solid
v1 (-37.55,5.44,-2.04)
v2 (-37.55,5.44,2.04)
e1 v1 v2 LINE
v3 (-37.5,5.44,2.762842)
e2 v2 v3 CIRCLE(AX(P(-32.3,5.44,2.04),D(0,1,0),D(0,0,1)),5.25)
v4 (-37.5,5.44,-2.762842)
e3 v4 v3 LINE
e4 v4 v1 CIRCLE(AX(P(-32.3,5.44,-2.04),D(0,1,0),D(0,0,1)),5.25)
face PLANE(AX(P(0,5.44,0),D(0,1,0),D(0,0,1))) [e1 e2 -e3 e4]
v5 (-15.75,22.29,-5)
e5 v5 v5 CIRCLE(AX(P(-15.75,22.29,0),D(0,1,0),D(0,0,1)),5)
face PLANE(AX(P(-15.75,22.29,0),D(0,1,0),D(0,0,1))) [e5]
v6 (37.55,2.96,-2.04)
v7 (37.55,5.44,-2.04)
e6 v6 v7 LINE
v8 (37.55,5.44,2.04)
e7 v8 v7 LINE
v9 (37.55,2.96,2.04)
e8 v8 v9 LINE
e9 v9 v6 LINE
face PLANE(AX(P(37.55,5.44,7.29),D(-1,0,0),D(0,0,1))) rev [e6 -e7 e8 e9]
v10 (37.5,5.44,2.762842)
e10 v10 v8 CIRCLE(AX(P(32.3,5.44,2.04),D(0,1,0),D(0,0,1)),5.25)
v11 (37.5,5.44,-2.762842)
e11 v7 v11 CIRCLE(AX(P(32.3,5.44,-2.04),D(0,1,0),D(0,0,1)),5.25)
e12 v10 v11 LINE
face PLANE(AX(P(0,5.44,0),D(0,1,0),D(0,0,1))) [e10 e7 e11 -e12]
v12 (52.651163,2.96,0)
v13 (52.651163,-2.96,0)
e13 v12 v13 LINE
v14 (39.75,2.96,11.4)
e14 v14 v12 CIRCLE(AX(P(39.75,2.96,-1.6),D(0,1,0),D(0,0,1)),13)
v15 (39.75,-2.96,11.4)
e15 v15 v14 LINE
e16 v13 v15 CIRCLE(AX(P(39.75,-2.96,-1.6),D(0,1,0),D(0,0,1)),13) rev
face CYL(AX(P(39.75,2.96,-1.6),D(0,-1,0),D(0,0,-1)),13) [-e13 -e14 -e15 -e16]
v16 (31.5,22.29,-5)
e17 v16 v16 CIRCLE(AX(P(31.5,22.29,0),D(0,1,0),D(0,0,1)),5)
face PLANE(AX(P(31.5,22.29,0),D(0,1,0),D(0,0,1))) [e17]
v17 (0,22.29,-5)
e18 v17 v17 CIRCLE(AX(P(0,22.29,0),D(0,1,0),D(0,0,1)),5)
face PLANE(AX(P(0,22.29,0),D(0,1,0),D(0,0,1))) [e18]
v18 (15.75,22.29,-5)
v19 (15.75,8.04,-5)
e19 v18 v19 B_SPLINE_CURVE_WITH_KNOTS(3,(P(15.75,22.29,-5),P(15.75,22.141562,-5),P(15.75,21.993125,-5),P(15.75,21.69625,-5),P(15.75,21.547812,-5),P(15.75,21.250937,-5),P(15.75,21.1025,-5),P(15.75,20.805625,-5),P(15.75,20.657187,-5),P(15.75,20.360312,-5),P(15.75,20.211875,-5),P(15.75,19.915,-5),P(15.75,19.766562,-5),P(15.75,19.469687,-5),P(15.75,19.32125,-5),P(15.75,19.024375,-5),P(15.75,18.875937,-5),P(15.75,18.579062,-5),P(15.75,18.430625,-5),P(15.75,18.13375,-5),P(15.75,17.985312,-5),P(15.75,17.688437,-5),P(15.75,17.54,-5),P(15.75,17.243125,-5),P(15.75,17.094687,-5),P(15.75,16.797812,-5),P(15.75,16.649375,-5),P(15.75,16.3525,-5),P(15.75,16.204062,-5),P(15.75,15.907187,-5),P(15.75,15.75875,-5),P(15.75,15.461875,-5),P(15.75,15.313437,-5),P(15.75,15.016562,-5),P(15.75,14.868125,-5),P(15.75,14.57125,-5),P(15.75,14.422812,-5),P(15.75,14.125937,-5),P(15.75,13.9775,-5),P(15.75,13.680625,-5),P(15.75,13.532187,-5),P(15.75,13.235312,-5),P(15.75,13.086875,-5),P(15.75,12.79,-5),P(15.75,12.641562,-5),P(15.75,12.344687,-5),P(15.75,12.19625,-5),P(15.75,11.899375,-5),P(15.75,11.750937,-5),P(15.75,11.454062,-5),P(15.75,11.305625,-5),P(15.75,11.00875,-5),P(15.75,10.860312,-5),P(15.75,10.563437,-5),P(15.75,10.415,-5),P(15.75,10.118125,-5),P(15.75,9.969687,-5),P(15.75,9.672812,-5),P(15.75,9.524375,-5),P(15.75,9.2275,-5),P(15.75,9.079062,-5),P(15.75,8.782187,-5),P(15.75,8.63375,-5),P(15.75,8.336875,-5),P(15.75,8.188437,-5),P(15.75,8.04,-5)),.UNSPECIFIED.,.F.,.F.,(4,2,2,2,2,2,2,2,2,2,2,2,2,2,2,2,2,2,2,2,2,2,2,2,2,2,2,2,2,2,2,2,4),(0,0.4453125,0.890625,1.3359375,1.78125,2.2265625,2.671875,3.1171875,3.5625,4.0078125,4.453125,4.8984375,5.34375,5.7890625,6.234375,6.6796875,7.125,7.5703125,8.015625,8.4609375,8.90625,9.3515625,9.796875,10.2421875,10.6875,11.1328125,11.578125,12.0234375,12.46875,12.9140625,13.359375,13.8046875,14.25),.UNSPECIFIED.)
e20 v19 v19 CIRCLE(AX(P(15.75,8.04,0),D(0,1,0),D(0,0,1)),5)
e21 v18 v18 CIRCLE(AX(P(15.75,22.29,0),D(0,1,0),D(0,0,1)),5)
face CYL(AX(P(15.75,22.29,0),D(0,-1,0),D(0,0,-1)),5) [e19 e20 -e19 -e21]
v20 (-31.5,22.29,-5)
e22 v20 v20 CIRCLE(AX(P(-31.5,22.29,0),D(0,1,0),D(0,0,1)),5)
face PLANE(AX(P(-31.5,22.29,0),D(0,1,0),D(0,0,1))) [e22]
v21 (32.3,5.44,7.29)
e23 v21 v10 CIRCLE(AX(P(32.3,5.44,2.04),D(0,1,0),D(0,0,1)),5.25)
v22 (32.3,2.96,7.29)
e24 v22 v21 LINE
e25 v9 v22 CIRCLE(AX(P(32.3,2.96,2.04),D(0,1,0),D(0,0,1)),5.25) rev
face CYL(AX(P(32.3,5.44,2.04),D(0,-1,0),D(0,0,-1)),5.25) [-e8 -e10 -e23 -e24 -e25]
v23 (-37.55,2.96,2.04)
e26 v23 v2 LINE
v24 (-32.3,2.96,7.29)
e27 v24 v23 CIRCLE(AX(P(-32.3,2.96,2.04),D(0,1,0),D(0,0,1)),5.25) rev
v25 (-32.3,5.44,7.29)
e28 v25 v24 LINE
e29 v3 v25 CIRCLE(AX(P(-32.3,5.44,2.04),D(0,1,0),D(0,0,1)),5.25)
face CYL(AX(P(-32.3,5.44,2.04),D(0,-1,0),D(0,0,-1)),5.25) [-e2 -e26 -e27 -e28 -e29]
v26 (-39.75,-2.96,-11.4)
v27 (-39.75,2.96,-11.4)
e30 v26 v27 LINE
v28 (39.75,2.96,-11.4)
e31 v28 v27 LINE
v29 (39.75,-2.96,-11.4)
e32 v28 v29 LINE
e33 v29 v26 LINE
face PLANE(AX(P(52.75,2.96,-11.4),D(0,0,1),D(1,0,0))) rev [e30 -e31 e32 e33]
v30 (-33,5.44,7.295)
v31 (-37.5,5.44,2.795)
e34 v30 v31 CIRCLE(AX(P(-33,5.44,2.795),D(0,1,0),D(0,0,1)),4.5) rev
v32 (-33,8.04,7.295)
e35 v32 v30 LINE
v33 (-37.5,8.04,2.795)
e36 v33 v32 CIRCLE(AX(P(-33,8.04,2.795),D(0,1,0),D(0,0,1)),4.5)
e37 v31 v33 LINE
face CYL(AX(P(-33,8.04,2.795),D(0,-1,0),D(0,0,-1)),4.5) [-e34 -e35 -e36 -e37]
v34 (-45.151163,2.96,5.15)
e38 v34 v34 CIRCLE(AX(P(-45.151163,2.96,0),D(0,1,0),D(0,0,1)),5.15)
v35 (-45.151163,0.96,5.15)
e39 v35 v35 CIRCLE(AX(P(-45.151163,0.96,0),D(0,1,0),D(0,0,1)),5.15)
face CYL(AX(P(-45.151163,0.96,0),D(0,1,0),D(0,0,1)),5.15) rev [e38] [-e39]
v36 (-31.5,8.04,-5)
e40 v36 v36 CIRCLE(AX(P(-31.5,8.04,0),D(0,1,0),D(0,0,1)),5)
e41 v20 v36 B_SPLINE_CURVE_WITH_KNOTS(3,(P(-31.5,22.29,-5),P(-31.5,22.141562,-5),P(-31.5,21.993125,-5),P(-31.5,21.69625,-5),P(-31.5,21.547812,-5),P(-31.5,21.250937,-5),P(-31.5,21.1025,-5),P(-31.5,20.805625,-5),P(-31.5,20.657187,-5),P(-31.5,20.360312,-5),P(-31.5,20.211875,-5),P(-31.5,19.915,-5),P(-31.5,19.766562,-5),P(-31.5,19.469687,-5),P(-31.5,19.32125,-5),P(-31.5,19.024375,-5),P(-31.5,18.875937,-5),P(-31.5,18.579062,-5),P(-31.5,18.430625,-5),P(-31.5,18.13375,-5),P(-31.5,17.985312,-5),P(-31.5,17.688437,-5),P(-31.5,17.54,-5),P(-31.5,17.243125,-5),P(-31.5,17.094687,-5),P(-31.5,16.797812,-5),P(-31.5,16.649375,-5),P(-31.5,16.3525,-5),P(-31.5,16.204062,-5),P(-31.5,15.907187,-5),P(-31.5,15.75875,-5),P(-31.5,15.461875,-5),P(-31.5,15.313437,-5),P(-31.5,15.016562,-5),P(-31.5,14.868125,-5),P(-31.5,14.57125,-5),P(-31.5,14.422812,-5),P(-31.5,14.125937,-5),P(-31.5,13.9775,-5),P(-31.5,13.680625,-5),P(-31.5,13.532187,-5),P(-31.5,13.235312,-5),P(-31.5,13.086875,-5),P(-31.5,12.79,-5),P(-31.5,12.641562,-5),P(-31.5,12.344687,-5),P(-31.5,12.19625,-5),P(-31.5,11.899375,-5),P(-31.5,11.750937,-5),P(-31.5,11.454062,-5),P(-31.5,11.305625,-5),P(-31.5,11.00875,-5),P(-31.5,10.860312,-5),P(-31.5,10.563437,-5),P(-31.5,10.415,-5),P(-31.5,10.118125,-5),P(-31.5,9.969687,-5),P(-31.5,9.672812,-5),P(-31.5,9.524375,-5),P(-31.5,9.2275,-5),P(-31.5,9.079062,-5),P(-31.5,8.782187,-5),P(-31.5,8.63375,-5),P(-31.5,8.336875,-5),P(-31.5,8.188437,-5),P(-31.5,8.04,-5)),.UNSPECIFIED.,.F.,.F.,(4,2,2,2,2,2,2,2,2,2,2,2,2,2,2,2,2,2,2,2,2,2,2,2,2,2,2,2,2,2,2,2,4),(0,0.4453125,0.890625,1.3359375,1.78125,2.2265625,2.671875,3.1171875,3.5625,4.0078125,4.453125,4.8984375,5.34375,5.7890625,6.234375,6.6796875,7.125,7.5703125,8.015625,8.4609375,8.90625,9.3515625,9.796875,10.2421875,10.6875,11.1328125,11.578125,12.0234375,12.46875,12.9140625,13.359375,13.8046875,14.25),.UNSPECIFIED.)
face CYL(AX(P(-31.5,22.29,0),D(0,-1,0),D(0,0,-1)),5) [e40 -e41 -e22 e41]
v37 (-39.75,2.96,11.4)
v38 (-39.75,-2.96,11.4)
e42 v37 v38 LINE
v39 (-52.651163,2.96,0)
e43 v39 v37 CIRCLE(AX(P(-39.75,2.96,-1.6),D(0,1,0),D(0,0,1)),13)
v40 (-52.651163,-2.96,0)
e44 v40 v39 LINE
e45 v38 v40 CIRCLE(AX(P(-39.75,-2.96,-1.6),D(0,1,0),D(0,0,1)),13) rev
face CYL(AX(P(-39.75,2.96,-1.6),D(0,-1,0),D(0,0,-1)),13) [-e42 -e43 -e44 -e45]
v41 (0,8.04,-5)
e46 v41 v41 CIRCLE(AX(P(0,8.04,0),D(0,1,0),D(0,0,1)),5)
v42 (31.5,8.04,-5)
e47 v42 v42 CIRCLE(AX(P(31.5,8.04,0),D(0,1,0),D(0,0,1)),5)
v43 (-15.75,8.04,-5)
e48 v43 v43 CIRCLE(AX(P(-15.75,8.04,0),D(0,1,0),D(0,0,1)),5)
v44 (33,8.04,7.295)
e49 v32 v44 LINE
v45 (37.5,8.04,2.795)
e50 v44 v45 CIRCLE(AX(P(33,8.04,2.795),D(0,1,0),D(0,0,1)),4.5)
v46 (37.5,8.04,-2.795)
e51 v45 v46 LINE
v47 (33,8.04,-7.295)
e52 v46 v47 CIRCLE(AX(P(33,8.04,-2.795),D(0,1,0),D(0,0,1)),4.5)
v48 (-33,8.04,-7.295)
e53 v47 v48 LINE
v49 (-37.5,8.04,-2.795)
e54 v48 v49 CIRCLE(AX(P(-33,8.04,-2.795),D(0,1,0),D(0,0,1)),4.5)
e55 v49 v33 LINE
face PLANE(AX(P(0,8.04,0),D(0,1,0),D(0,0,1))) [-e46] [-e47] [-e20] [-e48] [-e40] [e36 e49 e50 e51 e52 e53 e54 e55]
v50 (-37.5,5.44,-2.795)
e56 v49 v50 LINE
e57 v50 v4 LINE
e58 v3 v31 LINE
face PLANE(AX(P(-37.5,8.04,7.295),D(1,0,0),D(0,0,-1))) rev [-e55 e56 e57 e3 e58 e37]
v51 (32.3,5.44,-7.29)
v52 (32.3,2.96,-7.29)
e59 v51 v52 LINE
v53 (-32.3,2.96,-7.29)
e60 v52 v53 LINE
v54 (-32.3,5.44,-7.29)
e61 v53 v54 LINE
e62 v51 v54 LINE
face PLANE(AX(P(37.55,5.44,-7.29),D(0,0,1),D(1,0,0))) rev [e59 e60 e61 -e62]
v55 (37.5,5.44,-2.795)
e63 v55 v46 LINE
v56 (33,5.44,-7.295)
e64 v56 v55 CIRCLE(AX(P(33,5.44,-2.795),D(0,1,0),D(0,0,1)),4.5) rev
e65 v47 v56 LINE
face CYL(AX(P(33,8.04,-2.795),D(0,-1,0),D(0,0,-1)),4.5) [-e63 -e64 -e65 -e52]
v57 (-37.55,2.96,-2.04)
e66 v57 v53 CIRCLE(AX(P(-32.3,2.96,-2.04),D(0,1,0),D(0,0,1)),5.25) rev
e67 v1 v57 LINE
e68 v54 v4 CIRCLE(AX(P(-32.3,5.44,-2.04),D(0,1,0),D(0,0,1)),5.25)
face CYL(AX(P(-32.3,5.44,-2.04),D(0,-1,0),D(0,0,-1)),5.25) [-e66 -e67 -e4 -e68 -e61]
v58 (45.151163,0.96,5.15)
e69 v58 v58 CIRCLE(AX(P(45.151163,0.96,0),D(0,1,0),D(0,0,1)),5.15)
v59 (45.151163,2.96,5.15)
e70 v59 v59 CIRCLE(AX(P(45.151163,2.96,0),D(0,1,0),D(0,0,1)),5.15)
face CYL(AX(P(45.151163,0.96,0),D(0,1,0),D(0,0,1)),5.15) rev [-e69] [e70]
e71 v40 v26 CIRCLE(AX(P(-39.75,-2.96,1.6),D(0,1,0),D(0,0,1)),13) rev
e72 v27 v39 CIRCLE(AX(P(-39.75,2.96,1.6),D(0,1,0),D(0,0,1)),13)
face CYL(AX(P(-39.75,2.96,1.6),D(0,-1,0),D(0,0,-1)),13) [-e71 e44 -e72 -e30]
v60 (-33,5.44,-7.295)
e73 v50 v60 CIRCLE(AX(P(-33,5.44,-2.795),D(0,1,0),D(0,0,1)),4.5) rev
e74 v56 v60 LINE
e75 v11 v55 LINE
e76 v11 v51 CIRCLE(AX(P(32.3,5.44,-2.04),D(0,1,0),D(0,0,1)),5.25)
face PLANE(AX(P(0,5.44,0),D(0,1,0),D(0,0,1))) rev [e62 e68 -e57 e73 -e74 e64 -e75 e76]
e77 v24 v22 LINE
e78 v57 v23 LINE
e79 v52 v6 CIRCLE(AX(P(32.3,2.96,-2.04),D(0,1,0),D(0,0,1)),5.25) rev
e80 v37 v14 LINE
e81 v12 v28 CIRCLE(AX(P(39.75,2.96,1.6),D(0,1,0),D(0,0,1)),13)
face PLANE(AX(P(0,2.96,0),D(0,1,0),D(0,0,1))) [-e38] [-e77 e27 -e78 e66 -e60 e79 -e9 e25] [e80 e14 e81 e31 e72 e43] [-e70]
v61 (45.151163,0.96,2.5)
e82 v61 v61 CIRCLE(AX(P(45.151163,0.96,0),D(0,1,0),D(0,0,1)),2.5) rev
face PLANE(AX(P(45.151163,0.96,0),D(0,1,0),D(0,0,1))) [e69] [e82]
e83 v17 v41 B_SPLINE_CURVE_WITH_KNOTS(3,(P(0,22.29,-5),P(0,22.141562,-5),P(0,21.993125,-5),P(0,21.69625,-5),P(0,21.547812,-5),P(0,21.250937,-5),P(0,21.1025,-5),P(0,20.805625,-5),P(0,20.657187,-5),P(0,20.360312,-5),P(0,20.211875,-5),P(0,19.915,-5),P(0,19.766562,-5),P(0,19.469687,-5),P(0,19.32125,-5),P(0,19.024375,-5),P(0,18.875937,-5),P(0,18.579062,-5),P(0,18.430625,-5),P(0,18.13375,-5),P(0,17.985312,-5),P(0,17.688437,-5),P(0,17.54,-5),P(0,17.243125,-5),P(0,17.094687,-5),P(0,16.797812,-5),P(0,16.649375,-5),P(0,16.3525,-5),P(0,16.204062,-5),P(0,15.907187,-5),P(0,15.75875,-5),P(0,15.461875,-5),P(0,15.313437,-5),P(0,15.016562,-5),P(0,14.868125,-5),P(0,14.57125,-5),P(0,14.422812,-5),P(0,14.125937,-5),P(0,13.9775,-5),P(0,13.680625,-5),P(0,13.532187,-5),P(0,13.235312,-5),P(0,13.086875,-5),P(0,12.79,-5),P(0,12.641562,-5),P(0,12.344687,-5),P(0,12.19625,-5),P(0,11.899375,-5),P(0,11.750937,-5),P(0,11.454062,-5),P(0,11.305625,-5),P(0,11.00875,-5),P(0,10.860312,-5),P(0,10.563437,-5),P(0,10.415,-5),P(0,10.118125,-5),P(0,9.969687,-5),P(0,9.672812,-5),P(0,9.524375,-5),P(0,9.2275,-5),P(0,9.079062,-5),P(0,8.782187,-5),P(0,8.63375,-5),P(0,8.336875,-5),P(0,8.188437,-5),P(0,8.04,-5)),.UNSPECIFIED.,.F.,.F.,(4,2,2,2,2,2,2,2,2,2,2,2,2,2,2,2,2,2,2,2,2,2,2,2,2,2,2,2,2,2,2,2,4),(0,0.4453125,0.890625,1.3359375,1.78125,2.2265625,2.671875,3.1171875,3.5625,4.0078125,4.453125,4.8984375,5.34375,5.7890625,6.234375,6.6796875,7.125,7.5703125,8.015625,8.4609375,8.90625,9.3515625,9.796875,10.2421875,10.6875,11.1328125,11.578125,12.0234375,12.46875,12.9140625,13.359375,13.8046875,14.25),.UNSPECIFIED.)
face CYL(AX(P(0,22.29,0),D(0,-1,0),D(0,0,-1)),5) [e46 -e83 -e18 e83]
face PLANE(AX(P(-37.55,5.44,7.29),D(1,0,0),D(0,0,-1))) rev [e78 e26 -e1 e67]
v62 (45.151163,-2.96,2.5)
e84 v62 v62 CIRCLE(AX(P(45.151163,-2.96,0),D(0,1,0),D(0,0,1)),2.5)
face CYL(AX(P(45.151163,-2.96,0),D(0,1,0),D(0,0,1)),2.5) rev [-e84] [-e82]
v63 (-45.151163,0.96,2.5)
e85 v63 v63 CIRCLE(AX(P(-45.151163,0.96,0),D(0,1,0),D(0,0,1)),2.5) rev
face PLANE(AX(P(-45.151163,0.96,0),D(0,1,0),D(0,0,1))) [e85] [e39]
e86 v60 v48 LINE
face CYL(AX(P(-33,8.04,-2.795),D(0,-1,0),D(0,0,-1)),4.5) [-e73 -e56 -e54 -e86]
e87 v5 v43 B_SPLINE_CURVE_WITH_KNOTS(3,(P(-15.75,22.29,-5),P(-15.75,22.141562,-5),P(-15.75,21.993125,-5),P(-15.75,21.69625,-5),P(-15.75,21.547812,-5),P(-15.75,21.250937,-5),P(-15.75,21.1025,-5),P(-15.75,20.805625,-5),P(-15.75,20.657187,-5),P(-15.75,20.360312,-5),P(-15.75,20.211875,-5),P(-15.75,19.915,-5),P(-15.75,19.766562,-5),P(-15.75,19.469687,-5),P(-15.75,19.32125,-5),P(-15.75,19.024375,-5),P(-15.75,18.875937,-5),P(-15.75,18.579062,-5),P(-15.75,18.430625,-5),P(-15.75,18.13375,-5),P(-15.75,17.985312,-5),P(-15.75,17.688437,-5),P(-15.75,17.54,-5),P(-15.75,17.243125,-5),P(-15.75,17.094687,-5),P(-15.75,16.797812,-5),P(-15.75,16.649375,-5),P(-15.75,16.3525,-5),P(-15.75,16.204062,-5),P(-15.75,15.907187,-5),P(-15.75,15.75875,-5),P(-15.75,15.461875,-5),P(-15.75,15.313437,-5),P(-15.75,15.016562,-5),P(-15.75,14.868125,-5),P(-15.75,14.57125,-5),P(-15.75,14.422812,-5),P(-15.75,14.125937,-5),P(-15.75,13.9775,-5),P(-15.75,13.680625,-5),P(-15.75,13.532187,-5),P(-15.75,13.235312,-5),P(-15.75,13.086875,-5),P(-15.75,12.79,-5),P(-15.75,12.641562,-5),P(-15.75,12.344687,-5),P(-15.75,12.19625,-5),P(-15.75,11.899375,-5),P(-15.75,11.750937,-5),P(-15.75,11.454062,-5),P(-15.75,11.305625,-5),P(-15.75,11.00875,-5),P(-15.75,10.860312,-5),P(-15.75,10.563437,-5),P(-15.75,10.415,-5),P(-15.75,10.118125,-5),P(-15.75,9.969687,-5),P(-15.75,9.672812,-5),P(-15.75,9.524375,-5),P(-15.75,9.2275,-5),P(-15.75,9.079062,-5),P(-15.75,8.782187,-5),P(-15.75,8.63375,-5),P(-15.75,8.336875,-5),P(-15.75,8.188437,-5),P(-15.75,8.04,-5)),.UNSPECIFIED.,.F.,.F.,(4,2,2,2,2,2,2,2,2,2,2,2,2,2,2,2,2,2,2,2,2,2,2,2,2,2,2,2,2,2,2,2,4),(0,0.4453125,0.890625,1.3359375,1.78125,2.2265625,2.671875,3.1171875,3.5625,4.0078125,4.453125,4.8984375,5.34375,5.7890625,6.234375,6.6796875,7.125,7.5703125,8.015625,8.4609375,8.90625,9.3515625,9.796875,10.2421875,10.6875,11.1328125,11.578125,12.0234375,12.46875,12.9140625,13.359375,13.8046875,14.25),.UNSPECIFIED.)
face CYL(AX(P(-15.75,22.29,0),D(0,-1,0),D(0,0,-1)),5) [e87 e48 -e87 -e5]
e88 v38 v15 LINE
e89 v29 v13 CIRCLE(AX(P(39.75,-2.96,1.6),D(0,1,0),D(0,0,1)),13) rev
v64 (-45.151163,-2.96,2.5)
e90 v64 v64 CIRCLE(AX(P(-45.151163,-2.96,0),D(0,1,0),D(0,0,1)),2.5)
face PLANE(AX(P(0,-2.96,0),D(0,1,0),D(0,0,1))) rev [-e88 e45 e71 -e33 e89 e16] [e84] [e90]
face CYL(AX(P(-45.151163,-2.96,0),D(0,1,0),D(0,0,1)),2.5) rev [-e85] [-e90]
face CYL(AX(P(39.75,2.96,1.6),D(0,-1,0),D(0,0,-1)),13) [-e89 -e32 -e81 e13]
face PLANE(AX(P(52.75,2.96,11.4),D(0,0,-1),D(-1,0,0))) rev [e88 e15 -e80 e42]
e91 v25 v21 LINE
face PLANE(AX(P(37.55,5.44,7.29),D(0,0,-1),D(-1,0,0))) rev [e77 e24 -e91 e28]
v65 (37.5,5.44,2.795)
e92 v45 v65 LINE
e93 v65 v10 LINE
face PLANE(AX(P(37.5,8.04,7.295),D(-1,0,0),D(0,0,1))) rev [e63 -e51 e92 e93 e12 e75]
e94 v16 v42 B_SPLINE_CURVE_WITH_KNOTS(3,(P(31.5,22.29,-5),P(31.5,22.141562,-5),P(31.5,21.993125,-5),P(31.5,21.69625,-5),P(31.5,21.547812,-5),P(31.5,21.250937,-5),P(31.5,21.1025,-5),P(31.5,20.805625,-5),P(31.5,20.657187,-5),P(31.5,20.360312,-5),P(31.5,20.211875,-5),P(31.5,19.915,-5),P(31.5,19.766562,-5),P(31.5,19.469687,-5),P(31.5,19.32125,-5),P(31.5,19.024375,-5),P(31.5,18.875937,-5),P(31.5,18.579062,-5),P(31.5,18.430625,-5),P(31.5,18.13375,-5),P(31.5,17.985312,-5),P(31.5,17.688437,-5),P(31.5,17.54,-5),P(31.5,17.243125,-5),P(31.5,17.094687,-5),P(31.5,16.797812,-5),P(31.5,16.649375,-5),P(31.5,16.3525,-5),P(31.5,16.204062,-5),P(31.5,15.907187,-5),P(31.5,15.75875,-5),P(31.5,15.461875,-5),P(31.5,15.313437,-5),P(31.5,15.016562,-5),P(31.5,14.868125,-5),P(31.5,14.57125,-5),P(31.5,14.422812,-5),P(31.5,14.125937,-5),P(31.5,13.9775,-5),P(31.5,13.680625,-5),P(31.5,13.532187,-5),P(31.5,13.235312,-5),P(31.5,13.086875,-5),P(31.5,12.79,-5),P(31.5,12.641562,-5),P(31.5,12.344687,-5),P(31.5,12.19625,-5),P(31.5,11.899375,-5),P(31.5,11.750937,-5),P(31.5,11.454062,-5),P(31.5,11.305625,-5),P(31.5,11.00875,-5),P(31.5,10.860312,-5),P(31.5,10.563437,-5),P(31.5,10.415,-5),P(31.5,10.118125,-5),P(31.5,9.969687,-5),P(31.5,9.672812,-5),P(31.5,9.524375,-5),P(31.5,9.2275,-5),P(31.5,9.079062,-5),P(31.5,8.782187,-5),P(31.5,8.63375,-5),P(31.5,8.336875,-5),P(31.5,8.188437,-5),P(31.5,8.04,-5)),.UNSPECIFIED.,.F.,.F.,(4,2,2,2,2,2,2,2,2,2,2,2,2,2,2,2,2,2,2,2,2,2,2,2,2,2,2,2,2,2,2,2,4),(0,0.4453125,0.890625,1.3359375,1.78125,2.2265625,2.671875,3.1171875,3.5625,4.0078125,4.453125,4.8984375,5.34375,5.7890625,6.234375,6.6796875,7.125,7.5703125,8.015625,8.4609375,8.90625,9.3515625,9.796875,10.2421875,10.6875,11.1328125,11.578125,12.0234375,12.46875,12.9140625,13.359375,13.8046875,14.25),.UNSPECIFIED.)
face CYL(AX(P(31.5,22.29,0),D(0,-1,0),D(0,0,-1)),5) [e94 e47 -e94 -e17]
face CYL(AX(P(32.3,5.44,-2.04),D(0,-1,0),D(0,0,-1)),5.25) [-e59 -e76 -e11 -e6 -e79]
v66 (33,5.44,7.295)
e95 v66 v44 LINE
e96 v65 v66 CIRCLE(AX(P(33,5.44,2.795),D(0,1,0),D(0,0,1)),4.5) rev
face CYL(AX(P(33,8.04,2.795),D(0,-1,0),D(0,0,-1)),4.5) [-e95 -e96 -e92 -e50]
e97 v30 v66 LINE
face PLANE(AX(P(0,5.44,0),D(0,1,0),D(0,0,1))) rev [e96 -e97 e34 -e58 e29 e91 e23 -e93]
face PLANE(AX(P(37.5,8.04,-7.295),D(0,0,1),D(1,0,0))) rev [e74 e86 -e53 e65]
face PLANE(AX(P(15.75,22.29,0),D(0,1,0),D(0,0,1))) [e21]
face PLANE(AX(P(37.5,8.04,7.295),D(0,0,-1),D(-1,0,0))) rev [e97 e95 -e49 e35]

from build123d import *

# Parameters (mm, degrees)
SKETCH1_W           = 105.5
SKETCH1_H           = 22.8
BOSS_EXTRUDE1_DEPTH = 2.96
FILLET1_R           = 13
SKETCH2_R           = 2.5
CUT_EXTRUDE1_DEPTH  = 5.92
SKETCH3_R           = 5.15
CUT_EXTRUDE2_DEPTH  = 2
SKETCH4_W           = 75.1
SKETCH4_H           = 14.58
BOSS_EXTRUDE3_DEPTH = 2.48
FILLET2_R           = 5.25
SKETCH6_W           = 75
SKETCH6_H           = 14.59
BOSS_EXTRUDE4_DEPTH = 2.6
FILLET4_R           = 4.5
SKETCH7_R           = 5
BOSS_EXTRUDE5_DEPTH = 14.25


with BuildPart() as part:
    # Sketch1 → Boss-Extrude1 (new, symmetric)
    with BuildSketch(Plane(origin=(0, 0, 0), x_dir=(1, 0, 0), z_dir=(0, 1, 0))):
        Rectangle(SKETCH1_W, SKETCH1_H)
    extrude(amount=BOSS_EXTRUDE1_DEPTH, both=True)

    # Fillet1
    # the kernel refuses this fillet: 13 mm, written as the material it takes off along each edge
    with BuildSketch(Plane(origin=(-52.75, 35.46, -11.4), x_dir=(1, 0, 0), z_dir=(0, -1, 0)), Plane(origin=(52.75, -35.46, -11.4), x_dir=(-1, 0, 0), z_dir=(0, 1, 0))) as fillet1_piece_1:
        with BuildLine():
            CenterArc((FILLET1_R, FILLET1_R), FILLET1_R, 180, 90)
            Line((0, FILLET1_R), (0, 0))
            Line((0, 0), (FILLET1_R, 0))
        make_face()
    extrude(amount=70.92, mode=Mode.SUBTRACT)
    with BuildSketch(Plane(origin=(-52.75, 35.46, 11.4), x_dir=(1, 0, 0), z_dir=(0, -1, 0)), Plane(origin=(52.75, -35.46, 11.4), x_dir=(-1, 0, 0), z_dir=(0, 1, 0))) as fillet1_piece_2:
        with BuildLine():
            CenterArc((FILLET1_R, -FILLET1_R), FILLET1_R, 90, 90)
            Line((0, -FILLET1_R), (0, 0))
            Line((0, 0), (FILLET1_R, 0))
        make_face()
    extrude(amount=70.92, mode=Mode.SUBTRACT)

    # Sketch2 → Cut-Extrude1 (cut)
    with BuildSketch(Plane(origin=(0, 2.96, 0), x_dir=(1, 0, 0), z_dir=(0, 1, 0))):
        with Locations(Location((-45.151162738, 0, 0), (0, 0, 270))):
            Circle(SKETCH2_R)
        with Locations(Location((45.151162738, 0, 0), (0, 0, 270))):
            Circle(SKETCH2_R)
    extrude(amount=-CUT_EXTRUDE1_DEPTH, mode=Mode.SUBTRACT)

    # Sketch3 → Cut-Extrude2 (cut)
    with BuildSketch(Plane(origin=(0, 2.96, 0), x_dir=(1, 0, 0), z_dir=(0, 1, 0))):
        with Locations(Location((-45.151162738, 0, 0), (0, 0, 270))):
            Circle(SKETCH3_R)
        with Locations(Location((45.151162738, 0, 0), (0, 0, 270))):
            Circle(SKETCH3_R)
    extrude(amount=-CUT_EXTRUDE2_DEPTH, mode=Mode.SUBTRACT)

    # Sketch4 → Boss-Extrude3 (add)
    with BuildSketch(Plane(origin=(0, 2.96, 0), x_dir=(1, 0, 0), z_dir=(0, 1, 0))):
        Rectangle(SKETCH4_W, SKETCH4_H)
    extrude(amount=BOSS_EXTRUDE3_DEPTH)

    # Fillet2
    fillet2_edges = [part.edges().sort_by_distance(p)[0] for p in [
        (-37.55, 4.2, -7.29),
        (-37.55, 4.2, 7.29),
        (37.55, 4.2, 7.29),
        (37.55, 4.2, -7.29),
    ]]
    fillet(fillet2_edges, radius=FILLET2_R)

    # Sketch6 → Boss-Extrude4 (add)
    with BuildSketch(Plane(origin=(0, 5.44, 0), x_dir=(1, 0, 0), z_dir=(0, 1, 0))):
        Rectangle(SKETCH6_W, SKETCH6_H)
    extrude(amount=BOSS_EXTRUDE4_DEPTH)

    # Fillet4
    fillet4_edges = [part.edges().sort_by_distance(p)[0] for p in [
        (-37.5, 6.74, -7.295),
        (-37.5, 6.74, 7.295),
        (37.5, 6.74, 7.295),
        (37.5, 6.74, -7.295),
    ]]
    fillet(fillet4_edges, radius=FILLET4_R)

    # Sketch7 → Boss-Extrude5 (add)
    with BuildSketch(Plane(origin=(0, 8.04, 0), x_dir=(1, 0, 0), z_dir=(0, 1, 0))):
        with Locations(Location((-31.5, 0, 0), (0, 0, 90))):
            Circle(SKETCH7_R)
        with Locations(Location((-15.75, 0, 0), (0, 0, 90))):
            Circle(SKETCH7_R)
        with Locations(Location((0, 0, 0), (0, 0, 90))):
            Circle(SKETCH7_R)
        with Locations(Location((15.75, 0, 0), (0, 0, 90))):
            Circle(SKETCH7_R)
        with Locations(Location((31.5, 0, 0), (0, 0, 90))):
            Circle(SKETCH7_R)
    extrude(amount=BOSS_EXTRUDE5_DEPTH)


solid = part.part
